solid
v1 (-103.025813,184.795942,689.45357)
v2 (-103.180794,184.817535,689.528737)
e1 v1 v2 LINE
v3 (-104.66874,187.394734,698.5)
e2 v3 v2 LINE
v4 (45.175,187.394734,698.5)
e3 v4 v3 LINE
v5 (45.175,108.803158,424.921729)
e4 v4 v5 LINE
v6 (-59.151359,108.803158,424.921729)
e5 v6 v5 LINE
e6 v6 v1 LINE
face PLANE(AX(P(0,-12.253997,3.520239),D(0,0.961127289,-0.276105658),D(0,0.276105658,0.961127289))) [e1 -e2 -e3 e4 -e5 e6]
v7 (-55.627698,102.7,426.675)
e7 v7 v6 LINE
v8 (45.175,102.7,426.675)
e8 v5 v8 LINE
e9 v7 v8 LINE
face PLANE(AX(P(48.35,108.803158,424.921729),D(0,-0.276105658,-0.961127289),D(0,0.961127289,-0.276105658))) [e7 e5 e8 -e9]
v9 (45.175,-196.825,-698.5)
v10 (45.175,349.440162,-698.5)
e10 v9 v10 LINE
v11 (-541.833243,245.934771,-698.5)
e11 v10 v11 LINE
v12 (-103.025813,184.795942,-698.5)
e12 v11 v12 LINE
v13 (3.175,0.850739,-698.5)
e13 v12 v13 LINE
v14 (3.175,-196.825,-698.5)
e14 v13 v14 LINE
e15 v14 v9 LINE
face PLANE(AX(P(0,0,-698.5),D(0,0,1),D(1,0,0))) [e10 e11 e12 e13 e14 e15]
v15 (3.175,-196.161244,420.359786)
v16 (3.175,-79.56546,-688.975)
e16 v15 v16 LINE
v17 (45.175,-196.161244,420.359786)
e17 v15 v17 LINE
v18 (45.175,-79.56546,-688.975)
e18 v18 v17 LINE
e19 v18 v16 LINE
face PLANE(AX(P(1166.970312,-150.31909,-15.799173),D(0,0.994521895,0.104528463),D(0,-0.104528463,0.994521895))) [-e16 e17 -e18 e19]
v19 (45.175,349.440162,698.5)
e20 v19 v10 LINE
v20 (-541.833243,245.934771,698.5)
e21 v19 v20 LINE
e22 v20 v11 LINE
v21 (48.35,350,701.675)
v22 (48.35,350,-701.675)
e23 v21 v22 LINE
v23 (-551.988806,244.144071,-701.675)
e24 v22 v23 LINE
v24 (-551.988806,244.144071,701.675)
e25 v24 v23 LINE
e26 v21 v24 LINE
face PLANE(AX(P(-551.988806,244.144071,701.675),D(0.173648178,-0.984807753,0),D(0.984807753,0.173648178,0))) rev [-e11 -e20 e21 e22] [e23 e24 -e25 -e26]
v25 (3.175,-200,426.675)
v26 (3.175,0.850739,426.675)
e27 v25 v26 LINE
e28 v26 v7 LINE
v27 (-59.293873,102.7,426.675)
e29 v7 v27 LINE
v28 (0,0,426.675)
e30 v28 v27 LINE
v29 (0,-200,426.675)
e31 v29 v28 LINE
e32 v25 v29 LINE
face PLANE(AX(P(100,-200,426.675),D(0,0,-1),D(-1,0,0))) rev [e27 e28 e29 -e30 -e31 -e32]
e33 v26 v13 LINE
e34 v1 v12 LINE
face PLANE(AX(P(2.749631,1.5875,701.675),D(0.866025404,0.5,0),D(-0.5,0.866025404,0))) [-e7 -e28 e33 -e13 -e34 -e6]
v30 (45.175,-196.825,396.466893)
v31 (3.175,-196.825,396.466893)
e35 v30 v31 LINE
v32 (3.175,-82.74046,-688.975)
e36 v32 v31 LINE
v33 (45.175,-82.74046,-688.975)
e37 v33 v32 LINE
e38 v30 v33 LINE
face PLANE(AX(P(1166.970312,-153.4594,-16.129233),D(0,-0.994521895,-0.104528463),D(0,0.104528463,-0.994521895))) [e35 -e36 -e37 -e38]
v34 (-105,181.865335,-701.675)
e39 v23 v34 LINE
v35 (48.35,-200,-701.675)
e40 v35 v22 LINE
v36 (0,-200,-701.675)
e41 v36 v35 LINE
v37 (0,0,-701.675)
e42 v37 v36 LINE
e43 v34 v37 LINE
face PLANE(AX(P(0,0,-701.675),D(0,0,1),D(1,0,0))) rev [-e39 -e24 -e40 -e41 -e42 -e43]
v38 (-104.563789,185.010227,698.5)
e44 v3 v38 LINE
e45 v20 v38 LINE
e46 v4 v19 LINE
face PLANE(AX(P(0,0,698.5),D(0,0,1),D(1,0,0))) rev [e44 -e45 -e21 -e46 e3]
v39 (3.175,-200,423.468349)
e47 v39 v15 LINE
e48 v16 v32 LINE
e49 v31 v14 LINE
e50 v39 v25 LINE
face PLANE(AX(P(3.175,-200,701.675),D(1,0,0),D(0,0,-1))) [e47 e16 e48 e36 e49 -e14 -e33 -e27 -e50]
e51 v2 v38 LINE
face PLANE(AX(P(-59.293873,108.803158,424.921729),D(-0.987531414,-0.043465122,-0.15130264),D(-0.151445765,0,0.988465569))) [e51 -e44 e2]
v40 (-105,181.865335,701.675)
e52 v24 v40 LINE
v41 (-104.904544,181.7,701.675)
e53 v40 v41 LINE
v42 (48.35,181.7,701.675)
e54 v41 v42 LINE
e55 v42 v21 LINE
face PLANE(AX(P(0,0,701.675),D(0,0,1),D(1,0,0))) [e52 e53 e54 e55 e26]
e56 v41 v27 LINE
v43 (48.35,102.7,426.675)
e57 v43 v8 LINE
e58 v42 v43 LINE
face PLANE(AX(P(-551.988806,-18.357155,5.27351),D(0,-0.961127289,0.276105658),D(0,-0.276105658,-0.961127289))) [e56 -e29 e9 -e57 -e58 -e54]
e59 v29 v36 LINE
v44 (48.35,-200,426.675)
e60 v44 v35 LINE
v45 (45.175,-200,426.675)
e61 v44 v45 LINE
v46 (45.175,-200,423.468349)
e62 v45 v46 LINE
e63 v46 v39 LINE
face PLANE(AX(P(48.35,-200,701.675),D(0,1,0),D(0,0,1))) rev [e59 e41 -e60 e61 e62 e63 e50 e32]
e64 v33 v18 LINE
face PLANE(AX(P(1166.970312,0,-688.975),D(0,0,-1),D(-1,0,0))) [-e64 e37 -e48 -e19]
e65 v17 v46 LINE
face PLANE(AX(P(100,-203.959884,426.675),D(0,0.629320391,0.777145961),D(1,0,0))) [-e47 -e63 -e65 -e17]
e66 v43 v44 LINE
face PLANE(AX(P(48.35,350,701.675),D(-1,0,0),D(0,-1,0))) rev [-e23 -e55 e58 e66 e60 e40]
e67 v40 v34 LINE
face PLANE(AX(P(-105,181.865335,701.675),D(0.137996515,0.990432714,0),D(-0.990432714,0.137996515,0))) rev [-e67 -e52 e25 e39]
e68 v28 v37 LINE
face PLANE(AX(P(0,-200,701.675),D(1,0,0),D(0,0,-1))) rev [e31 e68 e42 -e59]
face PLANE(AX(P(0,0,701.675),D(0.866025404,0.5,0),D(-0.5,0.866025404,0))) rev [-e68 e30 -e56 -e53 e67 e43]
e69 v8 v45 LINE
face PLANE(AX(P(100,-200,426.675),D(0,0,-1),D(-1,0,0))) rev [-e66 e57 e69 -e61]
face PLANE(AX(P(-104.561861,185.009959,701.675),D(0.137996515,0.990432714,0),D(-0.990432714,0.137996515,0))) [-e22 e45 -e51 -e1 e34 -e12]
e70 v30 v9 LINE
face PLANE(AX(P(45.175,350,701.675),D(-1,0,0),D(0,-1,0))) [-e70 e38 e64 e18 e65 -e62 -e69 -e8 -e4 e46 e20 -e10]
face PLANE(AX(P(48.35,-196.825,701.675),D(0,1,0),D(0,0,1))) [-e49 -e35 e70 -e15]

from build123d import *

# Parameters (mm, degrees)
BOSS_EXTRUDE1_DEPTH = 701.675
SHELL1_T            = -3.175
SKETCH3_W           = 42
SKETCH3_H           = 290
CUT_EXTRUDE1_DEPTH  = 20
SKETCH7_W           = 275
SKETCH7_H           = 302.7
CUT_EXTRUDE5_DEPTH  = 100
CUT_EXTRUDE7_DEPTH  = 988.549739455
BOSS_EXTRUDE3_DEPTH = 6.35
BOSS_EXTRUDE4_DEPTH = 42
CHAMFER1_SIZE       = 7.134884114
CHAMFER1_SIZE_2     = 6.35


with BuildPart() as part:
    # Sketch2 → Boss-Extrude1 (new, symmetric)
    with BuildSketch(Plane.XY):
        Polygon((0, 0), (-105, 181.865334795), (-551.988806236, 244.144070894), (48.35, 350), (48.35, -200), (0, -200), align=None)
    extrude(amount=BOSS_EXTRUDE1_DEPTH, both=True)

    # Shell1
    shell1_openings = [part.faces().sort_by_distance(p)[0] for p in [
        (-251.819403118, 297.072035447, 0),
    ]]
    offset(amount=SHELL1_T, openings=shell1_openings, kind=Kind.INTERSECTION)

    # Sketch3 → Cut-Extrude1 (cut)
    with BuildSketch(Plane.XY.offset(701.675)):
        with Locations((24.175, -42.3)):
            Rectangle(SKETCH3_W, SKETCH3_H)
    extrude(amount=-CUT_EXTRUDE1_DEPTH, mode=Mode.SUBTRACT)

    # Sketch7 → Cut-Extrude5 (cut, symmetric)
    with BuildSketch(Plane.ZY):
        with Locations((564.175, -48.65)):
            Rectangle(SKETCH7_W, SKETCH7_H)
    extrude(amount=CUT_EXTRUDE5_DEPTH, both=True, mode=Mode.SUBTRACT)

    # Sketch9 → Cut-Extrude7 (cut, through all)
    with BuildSketch(Plane(origin=(48.35, 0, 0), x_dir=(0, 0, -1), z_dir=(1, 0, 0))):
        Polygon((-701.675, 102.7), (-426.675, 102.7), (-701.675, 181.7), align=None)
    extrude(amount=-CUT_EXTRUDE7_DEPTH, mode=Mode.SUBTRACT)

    # Sketch11 → Boss-Extrude3 (add)
    with BuildSketch(Plane(origin=(0, -18.35715529, 5.273510065), x_dir=(1, 0, 0), z_dir=(0, -0.9611272890955623, 0.27610565759472516))):
        Polygon((48.35, 724.567388561), (48.35, 438.44503711), (-59.293872646, 438.44503711), (-104.904543912, 724.567388561), align=None)
    extrude(amount=-BOSS_EXTRUDE3_DEPTH)

    # Sketch12 → Boss-Extrude4 (add)
    with BuildSketch(Plane(origin=(3.175, 0, 0), x_dir=(0, 0, -1), z_dir=(1, 0, 0))):
        Polygon((688.975, -79.565459926), (-396.466892858, -193.65), (-396.466892858, -196.825), (688.975, -82.740459926), align=None)
        Polygon((-396.466892858, -193.65), (-426.675, -196.825), (-396.466892858, -196.825), align=None)
    extrude(amount=BOSS_EXTRUDE4_DEPTH)

    # Chamfer1
    # the kernel refuses this chamfer: 7.134884114, 6.35 mm, written as the material it takes off along each edge
    with BuildSketch(Plane(origin=(3.175, -196.825, 426.675), x_dir=(0, -0.9997021141585574, 0.02440661686737172), z_dir=(1, 0, 0))) as chamfer1_piece_1:
        Polygon((CHAMFER1_SIZE * 0.999702114118, CHAMFER1_SIZE * 0.0244066168664), (-CHAMFER1_SIZE_2 * 0.128770240585, CHAMFER1_SIZE_2 * 0.991674455222), (0, 0), align=None)
    extrude(amount=42, mode=Mode.SUBTRACT)


solid = part.part
